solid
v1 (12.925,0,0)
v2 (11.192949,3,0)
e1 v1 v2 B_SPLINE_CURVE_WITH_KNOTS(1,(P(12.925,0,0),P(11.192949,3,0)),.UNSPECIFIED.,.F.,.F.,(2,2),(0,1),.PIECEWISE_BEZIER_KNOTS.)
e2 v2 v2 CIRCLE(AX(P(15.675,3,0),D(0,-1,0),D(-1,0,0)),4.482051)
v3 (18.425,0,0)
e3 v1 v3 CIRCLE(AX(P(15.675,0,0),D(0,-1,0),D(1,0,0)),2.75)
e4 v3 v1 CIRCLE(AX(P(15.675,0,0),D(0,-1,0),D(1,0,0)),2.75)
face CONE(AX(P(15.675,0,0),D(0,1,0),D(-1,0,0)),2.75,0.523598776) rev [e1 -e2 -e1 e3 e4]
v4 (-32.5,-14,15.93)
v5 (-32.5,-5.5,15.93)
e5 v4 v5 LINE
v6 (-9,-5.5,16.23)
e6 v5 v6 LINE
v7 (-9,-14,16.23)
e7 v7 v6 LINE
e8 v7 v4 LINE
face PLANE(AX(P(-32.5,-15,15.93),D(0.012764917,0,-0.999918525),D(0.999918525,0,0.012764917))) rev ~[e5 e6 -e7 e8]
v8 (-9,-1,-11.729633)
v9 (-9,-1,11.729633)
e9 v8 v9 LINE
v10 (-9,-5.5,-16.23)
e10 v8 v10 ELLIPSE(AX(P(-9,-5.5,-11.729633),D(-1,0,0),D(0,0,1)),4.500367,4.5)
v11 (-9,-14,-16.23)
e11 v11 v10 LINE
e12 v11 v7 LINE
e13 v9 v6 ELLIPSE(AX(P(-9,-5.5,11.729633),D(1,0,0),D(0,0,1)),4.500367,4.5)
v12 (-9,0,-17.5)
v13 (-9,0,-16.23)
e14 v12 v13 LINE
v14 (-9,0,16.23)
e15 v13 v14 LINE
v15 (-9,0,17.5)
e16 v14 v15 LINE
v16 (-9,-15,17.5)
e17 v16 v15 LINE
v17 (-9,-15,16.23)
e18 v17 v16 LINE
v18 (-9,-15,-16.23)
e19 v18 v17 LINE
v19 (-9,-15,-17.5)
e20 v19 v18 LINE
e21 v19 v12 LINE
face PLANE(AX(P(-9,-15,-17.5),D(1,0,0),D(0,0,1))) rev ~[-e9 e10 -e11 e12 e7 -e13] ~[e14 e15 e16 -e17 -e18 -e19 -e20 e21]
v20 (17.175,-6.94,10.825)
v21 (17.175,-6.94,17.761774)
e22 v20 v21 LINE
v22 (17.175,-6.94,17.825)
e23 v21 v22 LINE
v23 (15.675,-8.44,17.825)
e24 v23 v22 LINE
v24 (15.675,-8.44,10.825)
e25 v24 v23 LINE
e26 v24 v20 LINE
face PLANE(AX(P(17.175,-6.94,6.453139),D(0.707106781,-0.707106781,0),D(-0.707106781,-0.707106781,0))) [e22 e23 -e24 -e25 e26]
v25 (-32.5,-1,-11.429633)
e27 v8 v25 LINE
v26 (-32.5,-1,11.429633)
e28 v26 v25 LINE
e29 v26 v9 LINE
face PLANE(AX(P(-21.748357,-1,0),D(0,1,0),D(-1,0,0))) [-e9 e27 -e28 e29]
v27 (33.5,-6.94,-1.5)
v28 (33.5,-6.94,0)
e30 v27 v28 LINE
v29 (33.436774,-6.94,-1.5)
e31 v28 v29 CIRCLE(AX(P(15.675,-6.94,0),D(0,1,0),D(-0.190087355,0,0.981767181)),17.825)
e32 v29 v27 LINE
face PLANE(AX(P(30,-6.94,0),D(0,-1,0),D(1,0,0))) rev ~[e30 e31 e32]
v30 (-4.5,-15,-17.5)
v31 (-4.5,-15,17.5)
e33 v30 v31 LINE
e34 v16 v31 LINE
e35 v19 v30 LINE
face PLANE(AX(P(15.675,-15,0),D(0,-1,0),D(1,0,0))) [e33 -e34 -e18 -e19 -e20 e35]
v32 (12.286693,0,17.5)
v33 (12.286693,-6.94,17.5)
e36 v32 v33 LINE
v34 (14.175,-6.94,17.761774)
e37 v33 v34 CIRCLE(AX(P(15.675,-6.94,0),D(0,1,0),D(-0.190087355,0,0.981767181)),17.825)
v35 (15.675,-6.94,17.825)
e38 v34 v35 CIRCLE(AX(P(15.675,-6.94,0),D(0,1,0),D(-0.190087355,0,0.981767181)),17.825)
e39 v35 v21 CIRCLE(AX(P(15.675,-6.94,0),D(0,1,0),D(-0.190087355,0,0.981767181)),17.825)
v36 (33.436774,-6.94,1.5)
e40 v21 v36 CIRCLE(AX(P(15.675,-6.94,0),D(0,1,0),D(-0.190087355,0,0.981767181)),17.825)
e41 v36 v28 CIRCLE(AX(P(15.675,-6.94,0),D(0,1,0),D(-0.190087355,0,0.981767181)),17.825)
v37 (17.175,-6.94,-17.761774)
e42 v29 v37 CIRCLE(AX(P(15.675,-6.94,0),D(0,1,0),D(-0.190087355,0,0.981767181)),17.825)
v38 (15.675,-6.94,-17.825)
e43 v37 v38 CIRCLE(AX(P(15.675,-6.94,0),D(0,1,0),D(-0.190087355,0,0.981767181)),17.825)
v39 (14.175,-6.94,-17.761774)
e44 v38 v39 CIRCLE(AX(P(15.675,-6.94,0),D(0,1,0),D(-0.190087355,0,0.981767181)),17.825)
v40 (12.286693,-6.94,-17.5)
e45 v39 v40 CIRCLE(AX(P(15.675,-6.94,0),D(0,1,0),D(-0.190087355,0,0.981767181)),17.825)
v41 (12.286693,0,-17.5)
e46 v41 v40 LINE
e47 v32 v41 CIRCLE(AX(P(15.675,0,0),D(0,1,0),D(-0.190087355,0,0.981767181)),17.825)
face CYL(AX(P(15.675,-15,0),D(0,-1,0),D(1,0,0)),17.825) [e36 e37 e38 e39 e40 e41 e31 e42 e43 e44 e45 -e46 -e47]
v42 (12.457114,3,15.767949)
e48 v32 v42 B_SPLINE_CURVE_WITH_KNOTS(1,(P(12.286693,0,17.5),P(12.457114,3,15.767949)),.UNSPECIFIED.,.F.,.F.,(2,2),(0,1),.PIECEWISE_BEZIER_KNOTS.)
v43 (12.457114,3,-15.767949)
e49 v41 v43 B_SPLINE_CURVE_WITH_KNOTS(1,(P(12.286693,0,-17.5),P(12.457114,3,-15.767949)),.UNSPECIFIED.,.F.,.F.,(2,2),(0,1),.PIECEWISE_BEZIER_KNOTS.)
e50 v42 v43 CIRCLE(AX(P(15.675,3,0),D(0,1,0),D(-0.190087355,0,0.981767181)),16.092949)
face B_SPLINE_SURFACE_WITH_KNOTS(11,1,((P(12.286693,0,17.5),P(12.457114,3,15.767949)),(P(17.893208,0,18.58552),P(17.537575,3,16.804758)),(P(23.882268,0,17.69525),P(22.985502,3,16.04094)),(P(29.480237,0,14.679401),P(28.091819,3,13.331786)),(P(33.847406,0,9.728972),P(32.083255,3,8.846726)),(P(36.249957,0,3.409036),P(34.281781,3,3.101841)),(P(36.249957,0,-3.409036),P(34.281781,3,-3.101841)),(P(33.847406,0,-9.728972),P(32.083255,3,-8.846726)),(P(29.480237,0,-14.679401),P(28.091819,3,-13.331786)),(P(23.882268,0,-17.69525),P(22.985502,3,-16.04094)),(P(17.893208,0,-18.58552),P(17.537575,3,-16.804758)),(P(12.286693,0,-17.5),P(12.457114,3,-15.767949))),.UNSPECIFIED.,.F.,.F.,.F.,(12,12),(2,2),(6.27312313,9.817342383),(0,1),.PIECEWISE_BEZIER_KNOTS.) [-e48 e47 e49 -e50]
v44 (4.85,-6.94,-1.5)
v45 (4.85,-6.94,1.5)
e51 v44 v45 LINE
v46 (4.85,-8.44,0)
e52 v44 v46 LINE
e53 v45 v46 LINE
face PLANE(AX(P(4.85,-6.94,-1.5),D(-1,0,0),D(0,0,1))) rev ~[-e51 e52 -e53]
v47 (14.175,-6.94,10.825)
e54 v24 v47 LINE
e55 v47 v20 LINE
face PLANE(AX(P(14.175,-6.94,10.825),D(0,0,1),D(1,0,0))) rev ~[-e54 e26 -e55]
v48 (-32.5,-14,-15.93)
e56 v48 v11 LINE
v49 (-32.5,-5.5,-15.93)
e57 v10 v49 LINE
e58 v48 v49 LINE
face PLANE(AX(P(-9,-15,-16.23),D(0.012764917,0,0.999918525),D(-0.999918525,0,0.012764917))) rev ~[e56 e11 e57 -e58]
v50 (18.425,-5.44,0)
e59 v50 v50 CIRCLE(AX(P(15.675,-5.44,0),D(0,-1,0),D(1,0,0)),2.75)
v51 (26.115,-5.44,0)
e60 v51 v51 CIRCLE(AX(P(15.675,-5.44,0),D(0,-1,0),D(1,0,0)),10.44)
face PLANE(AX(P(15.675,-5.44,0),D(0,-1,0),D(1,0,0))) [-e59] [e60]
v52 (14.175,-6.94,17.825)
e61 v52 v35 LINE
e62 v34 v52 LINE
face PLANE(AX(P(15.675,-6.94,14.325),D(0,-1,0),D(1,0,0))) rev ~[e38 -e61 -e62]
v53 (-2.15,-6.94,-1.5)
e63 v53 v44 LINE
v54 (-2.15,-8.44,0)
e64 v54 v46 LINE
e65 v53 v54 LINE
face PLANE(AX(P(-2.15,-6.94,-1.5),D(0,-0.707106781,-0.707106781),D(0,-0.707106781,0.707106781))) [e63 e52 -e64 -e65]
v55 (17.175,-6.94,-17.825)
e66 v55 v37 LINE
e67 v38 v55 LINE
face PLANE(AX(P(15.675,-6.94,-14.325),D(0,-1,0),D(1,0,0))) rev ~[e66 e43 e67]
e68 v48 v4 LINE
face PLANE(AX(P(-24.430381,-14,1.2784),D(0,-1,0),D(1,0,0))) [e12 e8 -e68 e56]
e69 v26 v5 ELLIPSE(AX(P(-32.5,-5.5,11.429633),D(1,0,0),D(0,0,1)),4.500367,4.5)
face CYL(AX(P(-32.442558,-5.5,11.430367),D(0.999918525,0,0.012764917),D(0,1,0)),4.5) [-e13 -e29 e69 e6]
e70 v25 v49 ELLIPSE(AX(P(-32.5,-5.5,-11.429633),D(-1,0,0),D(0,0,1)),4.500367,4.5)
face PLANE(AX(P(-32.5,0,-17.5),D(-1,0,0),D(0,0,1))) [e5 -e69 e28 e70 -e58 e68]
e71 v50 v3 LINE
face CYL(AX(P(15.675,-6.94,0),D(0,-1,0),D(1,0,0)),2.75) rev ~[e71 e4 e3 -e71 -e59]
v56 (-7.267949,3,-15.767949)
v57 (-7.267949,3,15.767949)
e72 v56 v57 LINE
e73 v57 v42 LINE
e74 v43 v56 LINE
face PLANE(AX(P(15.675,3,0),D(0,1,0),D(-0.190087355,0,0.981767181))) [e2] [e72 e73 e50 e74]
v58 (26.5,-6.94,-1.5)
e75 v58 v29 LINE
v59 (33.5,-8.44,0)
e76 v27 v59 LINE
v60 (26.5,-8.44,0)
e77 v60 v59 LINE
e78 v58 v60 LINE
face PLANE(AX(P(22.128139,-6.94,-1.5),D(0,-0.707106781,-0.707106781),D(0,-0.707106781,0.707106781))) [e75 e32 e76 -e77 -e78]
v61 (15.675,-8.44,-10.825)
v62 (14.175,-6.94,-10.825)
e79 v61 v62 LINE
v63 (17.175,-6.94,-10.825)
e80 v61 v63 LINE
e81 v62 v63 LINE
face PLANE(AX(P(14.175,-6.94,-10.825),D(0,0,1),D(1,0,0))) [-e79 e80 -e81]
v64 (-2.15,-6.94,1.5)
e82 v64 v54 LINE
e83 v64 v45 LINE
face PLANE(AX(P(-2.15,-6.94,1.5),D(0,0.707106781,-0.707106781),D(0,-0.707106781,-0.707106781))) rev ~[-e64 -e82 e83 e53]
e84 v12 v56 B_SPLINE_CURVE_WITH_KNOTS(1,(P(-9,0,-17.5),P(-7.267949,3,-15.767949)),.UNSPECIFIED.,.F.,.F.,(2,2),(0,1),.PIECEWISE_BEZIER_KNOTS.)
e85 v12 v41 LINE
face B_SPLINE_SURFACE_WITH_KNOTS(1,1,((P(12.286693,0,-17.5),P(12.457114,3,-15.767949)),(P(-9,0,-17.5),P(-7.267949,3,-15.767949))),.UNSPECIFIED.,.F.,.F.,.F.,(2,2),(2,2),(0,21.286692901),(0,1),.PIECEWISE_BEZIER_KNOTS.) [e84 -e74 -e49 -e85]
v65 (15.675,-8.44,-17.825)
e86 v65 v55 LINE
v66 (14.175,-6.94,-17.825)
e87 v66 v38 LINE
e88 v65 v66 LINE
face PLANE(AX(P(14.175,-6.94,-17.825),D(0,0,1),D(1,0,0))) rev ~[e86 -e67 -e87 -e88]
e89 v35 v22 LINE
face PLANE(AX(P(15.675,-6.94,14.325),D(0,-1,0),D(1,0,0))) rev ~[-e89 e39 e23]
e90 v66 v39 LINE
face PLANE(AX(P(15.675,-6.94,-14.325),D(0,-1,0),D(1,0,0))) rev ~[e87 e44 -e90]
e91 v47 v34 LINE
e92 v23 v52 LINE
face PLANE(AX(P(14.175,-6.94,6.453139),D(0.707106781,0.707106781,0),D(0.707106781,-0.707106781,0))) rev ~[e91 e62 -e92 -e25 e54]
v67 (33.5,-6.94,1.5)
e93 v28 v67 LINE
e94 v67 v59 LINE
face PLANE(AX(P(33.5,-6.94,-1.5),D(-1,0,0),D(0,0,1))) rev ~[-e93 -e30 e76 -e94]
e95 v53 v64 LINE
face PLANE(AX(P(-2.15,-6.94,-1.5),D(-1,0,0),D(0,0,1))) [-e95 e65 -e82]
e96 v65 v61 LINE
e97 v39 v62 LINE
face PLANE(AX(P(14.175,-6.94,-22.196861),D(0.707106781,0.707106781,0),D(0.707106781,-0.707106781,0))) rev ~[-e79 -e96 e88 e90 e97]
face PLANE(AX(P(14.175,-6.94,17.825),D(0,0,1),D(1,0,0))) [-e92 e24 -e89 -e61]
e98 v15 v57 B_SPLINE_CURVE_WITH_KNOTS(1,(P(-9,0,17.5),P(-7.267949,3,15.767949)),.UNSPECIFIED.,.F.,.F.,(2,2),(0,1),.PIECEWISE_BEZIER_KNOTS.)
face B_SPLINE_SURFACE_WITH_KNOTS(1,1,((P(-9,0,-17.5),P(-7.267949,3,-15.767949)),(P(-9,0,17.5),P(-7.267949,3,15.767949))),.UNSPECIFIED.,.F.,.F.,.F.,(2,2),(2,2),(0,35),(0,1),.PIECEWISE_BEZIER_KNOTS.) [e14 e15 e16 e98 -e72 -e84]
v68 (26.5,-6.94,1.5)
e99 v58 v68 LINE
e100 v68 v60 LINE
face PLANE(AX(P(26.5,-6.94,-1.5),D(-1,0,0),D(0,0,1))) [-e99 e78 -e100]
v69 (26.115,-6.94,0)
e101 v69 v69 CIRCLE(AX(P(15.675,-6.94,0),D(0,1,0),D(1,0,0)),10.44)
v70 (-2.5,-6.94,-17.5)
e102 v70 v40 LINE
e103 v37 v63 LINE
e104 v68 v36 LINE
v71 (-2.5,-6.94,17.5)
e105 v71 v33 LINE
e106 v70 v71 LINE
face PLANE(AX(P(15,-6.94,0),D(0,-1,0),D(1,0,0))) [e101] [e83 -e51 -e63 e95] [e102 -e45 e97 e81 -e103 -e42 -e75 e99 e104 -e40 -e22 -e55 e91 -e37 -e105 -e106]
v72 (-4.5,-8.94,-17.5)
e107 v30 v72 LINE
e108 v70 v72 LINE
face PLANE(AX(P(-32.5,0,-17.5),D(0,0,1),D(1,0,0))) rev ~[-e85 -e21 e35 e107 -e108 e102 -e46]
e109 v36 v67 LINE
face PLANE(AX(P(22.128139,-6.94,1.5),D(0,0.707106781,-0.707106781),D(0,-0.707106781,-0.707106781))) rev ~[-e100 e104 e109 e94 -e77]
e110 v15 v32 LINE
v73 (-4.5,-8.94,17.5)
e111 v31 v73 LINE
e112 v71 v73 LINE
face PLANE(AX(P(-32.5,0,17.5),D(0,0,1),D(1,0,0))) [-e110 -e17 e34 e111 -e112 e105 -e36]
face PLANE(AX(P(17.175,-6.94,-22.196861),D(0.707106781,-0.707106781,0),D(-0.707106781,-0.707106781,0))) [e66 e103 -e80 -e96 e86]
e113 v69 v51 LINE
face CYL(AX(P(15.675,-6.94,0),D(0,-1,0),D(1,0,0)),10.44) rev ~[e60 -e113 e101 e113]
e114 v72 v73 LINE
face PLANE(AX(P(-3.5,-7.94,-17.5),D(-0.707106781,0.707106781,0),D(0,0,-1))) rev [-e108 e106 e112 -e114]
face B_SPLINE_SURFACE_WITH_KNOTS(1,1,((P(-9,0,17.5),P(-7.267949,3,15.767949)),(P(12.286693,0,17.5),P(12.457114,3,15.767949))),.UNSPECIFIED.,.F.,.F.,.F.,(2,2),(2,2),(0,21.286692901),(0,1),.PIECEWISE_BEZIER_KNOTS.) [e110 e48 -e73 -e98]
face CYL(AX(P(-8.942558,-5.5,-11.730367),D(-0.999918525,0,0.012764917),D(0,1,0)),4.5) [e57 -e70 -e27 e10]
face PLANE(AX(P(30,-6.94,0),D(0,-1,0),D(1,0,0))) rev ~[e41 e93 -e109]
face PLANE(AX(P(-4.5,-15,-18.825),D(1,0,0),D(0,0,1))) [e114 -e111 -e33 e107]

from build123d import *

# Parameters (mm, degrees)
F0_W         = 65
F0_H         = 35
F1_DEPTH     = 15
F2_R         = 17.825
F3_DEPTH     = 15
F4_W         = 39
F4_H         = 37.65
F5_DEPTH     = 8.06
F7_DEPTH     = 15.001
F8_W         = 30.8607626557
F8_H         = 37.5567990541
F9_DEPTH     = 1
F10_W        = 25.4967134297
F10_H        = 35
F11_DEPTH    = 1
F12_SIZE     = 2
F13_R        = 2.75
F14_DEPTH    = 6.941
F15_R        = 10.44
F16_DEPTH    = 1.5
F17_R        = 4.5
F19_DEPTH    = 25
F20_W        = 7
F20_H        = 3
F20_W_2      = 3
F20_H_2      = 7
F21_DEPTH    = 1.7
F22_T1_DEPTH = 15.7437221591
F22_T3_DEPTH = 15.7437221591
F22_T5_DEPTH = 11.3718610795
F22_T7_DEPTH = 15.7437221591
F3_FACE1_R   = 2.75
F23_DEPTH    = 3
F23_TAPER    = 30


# Not quite as in the source:
# - a fillet or chamfer that OpenCascade refuses, or shapes differently, is made with other operations: its cross-section is extruded or revolved along the edge and cut away or added


with BuildPart() as f1:
    # F0 (on Front) → F1 (new body)
    with BuildSketch(Plane.XZ):
        Rectangle(F0_W, F0_H)
    extrude(amount=F1_DEPTH)

    # F2 (on face) → F3 (join, through all)
    with BuildSketch(Plane.XZ.offset(15)):
        with Locations((15.675, 0)):
            Circle(F2_R)
    extrude(amount=-F3_DEPTH)

    # F4 (on face) → F5 (cut)
    with BuildSketch(Plane.XZ.offset(15)):
        with Locations((15, 0)):
            Rectangle(F4_W, F4_H)
    extrude(amount=-F5_DEPTH, mode=Mode.SUBTRACT)

    # F6 (on face) → F7 (cut, through all)
    with BuildSketch(Plane.XZ.offset(15)):
        Polygon((-9, 16.23), (-9, 17.5), (-32.5, 17.5), (-32.5, 15.93), align=None)
        Polygon((-32.5, -17.5), (-9, -17.5), (-9, -16.23), (-32.5, -15.93), align=None)
    extrude(amount=-F7_DEPTH, mode=Mode.SUBTRACT)

    # F8 (on face) → F9 (cut)
    with BuildSketch(Plane.XZ.offset(15)):
        with Locations((-24.4303813279, 1.2783995271)):
            Rectangle(F8_W, F8_H)
    extrude(amount=-F9_DEPTH, mode=Mode.SUBTRACT)

    # F10 (on face) → F11 (cut)
    with BuildSketch(Plane(origin=(0, 0, 0), x_dir=(-1, 0, 0), z_dir=(0, 1, 0))):
        with Locations((21.7483567148, 0)):
            Rectangle(F10_W, F10_H)
    extrude(amount=-F11_DEPTH, mode=Mode.SUBTRACT)

    # F12
    f12_edges = [f1.edges().sort_by_distance(p)[0] for p in [
        (-4.5, -6.94, 0),
    ]]
    chamfer(f12_edges, length=F12_SIZE)

    # F13 (on face) → F14 (cut, through all)
    with BuildSketch(Plane.XZ.offset(6.94)):
        with Locations((15.675, 0)):
            Circle(F13_R)
    extrude(amount=-F14_DEPTH, mode=Mode.SUBTRACT)

    # F15 (on face) → F16 (cut)
    with BuildSketch(Plane.XZ.offset(6.94)):
        with Locations((15.675, 0)):
            Circle(F15_R)
    extrude(amount=-F16_DEPTH, mode=Mode.SUBTRACT)

    # F17
    f17_edges = [f1.edges().sort_by_distance(p)[0] for p in [
        (-20.75, -1, 16.08),
        (-20.75, -1, -16.08),
    ]]
    fillet(f17_edges, radius=F17_R)

    # F18 (on face) → F19 (cut)
    with BuildSketch(Plane.XZ.offset(6.94)):
        with BuildLine():
            ThreePointArc((15.675, 17.825), (33.5, 0), (15.675, -17.825))
            Line((15.675, -17.825), (14.3514294177, -24.9375402927))
            Line((14.3514294177, -24.9375402927), (39.8063696921, -24.9375402927))
            Line((39.8063696921, -24.9375402927), (43.452385813, 22.5534923375))
            Line((43.452385813, 22.5534923375), (15.675, 27.0696729422))
            Line((15.675, 27.0696729422), (15.675, 17.825))
        make_face()
    extrude(amount=-F19_DEPTH, mode=Mode.SUBTRACT)

    # F20 (on face) → F21 (join)
    with BuildSketch(Plane.XZ.offset(6.94)):
        with Locations((30, 0)):
            Rectangle(F20_W, F20_H)
        with Locations((15.675, 14.325)):
            Rectangle(F20_W_2, F20_H_2)
        with Locations((1.35, 0)):
            Rectangle(F20_W, F20_H)
        with Locations((15.675, -14.325)):
            Rectangle(F20_W_2, F20_H_2)
    extrude(amount=F21_DEPTH)

    # F22: chamfer of 1.7 on 8 edges, made by hand

    # F22_s2 → F22_t1 (cut)
    with BuildSketch(Plane.YZ.offset(22.1281389205)):
        Polygon((-6.94, 1.5), (-8.64, -0.2), (-8.64, 1.5), align=None)
        Polygon((-6.94, -1.5), (-8.64, 0.2), (-8.64, -1.5), align=None)
    extrude(amount=F22_T1_DEPTH, mode=Mode.SUBTRACT)

    # F22_s4 → F22_t3 (cut)
    with BuildSketch(Plane.XY.offset(-22.1968610795)):
        Polygon((17.175, -6.94), (15.475, -8.64), (17.175, -8.64), align=None)
        Polygon((14.175, -6.94), (15.875, -8.64), (14.175, -8.64), align=None)
    extrude(amount=F22_T3_DEPTH, mode=Mode.SUBTRACT)

    # F22_s6 → F22_t5 (cut)
    with BuildSketch(Plane.YZ.offset(-2.15)):
        Polygon((-6.94, -1.5), (-8.64, 0.2), (-8.64, -1.5), align=None)
        Polygon((-6.94, 1.5), (-8.64, -0.2), (-8.64, 1.5), align=None)
    extrude(amount=F22_T5_DEPTH, mode=Mode.SUBTRACT)

    # F22_s8 → F22_t7 (cut)
    with BuildSketch(Plane.XY.offset(6.4531389205)):
        Polygon((14.175, -6.94), (15.875, -8.64), (14.175, -8.64), align=None)
        Polygon((17.175, -6.94), (15.475, -8.64), (17.175, -8.64), align=None)
    extrude(amount=F22_T7_DEPTH, mode=Mode.SUBTRACT)

    # F3_face1 (on face) → F23 (join)
    with BuildSketch(Plane(origin=(0.7743209172, 0, 0), x_dir=(-1, 0, 0), z_dir=(0, 1, 0))):
        with BuildLine():
            Line((-11.5123719834, -17.5), (9.7743209172, -17.5))
            Line((9.7743209172, -17.5), (9.7743209172, 17.5))
            Line((9.7743209172, 17.5), (-11.5123719834, 17.5))
            ThreePointArc((-11.5123719834, 17.5), (-32.7256790828, 0), (-11.5123719834, -17.5))
        make_face()
        with Locations((-14.9006790828, 0)):
            Circle(F3_FACE1_R, mode=Mode.SUBTRACT)
    extrude(amount=F23_DEPTH, taper=F23_TAPER)


solid = f1.part
